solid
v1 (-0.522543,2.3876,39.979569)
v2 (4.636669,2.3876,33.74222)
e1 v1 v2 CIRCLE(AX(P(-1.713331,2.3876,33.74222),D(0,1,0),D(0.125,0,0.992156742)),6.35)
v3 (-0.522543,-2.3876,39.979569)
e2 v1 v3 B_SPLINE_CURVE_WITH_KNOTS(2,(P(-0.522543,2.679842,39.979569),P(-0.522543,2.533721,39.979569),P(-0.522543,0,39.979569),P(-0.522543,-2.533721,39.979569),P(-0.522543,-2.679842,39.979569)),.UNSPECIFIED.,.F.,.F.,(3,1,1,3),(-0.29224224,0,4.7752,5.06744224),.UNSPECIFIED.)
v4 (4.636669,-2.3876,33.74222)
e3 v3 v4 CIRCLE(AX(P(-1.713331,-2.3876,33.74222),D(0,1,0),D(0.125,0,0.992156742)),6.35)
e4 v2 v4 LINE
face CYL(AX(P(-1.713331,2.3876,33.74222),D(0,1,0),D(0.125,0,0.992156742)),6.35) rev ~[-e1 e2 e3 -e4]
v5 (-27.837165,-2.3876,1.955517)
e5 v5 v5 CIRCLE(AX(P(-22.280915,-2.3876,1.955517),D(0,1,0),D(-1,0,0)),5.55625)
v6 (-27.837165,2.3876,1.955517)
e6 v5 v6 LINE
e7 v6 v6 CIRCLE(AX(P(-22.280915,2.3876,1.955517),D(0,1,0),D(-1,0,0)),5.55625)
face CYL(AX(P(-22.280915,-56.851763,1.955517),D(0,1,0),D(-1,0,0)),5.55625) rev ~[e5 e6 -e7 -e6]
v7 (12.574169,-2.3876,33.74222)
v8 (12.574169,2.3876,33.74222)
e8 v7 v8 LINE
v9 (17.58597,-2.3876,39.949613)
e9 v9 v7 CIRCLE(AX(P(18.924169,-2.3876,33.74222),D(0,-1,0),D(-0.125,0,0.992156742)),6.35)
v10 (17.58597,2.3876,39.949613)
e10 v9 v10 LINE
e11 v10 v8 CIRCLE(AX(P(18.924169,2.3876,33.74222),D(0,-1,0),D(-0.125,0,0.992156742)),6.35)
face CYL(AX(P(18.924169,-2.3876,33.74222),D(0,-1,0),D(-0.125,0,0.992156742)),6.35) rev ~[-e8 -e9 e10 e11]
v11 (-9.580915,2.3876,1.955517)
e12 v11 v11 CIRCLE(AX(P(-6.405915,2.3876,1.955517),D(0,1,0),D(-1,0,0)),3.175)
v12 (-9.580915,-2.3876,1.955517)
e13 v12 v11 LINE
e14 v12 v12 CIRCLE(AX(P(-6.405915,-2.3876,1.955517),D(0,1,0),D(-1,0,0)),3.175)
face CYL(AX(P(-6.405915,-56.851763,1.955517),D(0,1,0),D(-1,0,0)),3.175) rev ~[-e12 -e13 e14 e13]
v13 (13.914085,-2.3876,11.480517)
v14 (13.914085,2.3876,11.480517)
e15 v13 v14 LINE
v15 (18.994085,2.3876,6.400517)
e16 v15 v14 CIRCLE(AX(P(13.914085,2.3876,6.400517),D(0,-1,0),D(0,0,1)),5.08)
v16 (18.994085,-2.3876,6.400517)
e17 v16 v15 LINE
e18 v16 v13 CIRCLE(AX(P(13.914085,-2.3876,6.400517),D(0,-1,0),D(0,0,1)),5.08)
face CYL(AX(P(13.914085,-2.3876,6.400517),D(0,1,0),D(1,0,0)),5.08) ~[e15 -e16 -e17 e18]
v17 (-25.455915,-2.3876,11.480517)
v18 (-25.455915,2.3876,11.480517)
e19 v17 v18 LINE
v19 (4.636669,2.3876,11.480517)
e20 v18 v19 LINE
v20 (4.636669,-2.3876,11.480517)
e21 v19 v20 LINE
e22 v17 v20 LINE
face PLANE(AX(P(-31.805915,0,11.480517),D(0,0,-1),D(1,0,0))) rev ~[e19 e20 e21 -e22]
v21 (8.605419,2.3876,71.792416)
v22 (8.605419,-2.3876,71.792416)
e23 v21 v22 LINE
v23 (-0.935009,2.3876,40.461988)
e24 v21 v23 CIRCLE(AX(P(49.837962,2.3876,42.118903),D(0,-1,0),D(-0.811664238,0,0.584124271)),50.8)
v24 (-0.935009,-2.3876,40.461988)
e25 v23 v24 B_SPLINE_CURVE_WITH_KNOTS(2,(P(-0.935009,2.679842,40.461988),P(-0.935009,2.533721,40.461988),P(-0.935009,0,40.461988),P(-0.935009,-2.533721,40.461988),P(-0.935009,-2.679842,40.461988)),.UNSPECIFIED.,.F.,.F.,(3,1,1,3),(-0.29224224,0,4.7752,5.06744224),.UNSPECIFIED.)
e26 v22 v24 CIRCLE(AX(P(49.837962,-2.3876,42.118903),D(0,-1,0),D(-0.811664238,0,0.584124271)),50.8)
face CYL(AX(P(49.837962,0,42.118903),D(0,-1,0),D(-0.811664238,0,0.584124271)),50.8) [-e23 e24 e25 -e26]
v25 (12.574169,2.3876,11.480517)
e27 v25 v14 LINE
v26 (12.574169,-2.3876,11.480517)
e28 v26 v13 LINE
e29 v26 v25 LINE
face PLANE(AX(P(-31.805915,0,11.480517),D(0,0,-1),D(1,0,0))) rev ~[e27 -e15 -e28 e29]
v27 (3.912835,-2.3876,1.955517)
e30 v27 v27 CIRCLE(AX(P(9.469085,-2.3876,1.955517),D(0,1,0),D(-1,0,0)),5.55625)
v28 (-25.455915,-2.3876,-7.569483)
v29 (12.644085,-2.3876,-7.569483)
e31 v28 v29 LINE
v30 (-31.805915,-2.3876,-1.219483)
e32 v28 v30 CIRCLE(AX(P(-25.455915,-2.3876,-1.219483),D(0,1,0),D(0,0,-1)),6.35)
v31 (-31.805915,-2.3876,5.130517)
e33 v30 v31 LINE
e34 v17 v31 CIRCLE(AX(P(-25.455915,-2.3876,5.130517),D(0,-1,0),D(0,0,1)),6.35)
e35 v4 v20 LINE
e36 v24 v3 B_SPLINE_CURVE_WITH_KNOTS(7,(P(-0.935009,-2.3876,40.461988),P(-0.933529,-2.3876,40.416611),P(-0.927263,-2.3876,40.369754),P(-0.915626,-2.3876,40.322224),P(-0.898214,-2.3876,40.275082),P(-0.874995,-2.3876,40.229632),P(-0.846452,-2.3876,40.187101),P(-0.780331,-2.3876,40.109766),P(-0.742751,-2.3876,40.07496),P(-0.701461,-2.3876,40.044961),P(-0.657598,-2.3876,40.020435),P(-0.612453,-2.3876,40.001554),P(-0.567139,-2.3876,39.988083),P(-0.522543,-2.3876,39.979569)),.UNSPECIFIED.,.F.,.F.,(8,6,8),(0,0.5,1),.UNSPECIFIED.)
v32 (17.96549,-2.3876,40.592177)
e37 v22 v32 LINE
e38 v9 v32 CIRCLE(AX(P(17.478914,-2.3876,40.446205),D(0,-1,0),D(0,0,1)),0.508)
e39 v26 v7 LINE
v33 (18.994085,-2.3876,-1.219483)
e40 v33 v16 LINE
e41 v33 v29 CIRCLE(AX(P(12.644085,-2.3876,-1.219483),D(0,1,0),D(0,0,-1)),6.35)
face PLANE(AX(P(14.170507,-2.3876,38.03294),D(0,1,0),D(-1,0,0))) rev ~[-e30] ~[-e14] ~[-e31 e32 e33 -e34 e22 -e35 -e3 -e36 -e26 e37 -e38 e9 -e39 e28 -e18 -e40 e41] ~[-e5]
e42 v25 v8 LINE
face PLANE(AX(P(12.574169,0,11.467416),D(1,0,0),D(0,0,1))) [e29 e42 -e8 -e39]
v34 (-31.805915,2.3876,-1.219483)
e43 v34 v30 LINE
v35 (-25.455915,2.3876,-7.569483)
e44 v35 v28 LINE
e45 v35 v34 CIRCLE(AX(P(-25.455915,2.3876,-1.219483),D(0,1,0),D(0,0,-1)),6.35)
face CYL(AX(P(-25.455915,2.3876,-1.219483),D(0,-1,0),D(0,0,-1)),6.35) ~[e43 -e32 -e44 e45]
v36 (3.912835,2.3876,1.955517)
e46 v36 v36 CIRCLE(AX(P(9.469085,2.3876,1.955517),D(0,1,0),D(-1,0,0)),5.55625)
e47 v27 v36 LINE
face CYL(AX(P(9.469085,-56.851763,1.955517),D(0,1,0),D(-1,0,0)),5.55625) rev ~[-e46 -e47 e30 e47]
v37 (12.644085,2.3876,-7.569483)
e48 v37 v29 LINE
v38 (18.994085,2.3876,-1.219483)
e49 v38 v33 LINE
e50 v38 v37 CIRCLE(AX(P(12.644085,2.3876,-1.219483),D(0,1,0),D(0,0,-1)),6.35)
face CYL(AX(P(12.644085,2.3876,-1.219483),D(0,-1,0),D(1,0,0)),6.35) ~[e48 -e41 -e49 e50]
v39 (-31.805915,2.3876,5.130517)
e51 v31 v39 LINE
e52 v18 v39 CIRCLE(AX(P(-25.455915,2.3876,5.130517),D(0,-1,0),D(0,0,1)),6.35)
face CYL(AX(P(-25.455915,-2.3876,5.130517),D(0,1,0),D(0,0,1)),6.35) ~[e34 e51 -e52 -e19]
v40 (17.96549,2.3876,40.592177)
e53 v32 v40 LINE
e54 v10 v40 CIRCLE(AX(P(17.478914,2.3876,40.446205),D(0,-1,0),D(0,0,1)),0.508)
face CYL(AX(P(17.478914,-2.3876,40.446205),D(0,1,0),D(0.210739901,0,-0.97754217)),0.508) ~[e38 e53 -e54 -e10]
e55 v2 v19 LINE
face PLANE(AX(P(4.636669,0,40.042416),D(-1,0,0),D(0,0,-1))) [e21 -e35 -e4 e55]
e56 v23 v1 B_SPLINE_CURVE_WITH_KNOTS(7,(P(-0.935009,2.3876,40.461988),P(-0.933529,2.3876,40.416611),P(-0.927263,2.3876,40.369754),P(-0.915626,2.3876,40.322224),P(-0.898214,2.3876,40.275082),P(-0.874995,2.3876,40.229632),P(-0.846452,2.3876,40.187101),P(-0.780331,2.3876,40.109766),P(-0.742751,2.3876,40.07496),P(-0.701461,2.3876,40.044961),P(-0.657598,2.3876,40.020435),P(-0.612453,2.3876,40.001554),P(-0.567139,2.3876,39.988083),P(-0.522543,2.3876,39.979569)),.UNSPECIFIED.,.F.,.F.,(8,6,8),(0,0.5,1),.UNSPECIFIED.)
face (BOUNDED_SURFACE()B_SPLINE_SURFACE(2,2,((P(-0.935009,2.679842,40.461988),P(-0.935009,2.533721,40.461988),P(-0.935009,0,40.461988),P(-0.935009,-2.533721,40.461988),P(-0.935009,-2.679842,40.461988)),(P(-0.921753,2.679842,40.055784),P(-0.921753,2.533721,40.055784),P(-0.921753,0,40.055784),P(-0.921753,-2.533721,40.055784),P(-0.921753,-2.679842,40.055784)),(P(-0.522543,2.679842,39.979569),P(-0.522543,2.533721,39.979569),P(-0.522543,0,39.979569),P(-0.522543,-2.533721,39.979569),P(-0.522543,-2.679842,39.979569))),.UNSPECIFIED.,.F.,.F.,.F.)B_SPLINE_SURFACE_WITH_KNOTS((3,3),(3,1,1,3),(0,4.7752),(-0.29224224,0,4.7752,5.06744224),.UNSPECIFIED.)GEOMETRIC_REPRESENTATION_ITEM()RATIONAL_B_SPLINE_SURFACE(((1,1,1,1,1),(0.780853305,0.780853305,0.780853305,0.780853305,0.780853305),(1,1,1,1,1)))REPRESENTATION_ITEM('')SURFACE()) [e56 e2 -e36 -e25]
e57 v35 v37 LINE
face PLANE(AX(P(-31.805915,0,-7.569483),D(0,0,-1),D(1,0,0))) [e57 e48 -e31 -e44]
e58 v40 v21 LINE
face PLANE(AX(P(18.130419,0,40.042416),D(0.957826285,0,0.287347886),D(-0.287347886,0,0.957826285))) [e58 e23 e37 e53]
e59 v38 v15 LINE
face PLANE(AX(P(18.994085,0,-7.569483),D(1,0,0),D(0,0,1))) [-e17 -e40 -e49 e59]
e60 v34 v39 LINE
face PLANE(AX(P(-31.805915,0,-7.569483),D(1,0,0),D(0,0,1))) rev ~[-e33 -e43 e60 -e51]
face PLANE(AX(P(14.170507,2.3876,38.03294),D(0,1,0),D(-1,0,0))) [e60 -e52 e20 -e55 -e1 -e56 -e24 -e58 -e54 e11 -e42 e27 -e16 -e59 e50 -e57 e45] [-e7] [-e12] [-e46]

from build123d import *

# Parameters (mm, degrees)
F1_W           = 50.8
F1_H           = 19.05
F2_DEPTH       = 2.3876
F2_DEPTH_BACK  = 2.3876
F3_R           = 5.08
F4_R           = 6.35
F5_R           = 6.35
F7_D           = 11.1125
F9_D           = 11.1125
F11_D          = 6.35
F13_DEPTH      = 2.3876
F13_DEPTH_BACK = 2.3876
F15_DEPTH      = 2.3876
F15_DEPTH_BACK = 2.3876
F16_T1_DEPTH   = 4.7752
F16_T6_DEPTH   = 4.7752
F17_R          = 0.508


# Not quite as in the source:
# - a fillet or chamfer that OpenCascade refuses, or shapes differently, is made with other operations: its cross-section is extruded or revolved along the edge and cut away or added


with BuildPart() as f2:
    # F1 (on face) → F2 (new body, two sides)
    with BuildSketch(Plane.XZ) as f2_sk:
        with Locations((-6.4059151608, 1.9555166364)):
            Rectangle(F1_W, F1_H)
    extrude(amount=F2_DEPTH)
    extrude(f2_sk.sketch, amount=-F2_DEPTH_BACK)

    # F3
    f3_edges = [f2.edges().sort_by_distance(p)[0] for p in [
        (18.994085, 0, 11.480517),
    ]]
    fillet(f3_edges, radius=F3_R)

    # F4
    f4_edges = [f2.edges().sort_by_distance(p)[0] for p in [
        (18.994085, 0, -7.569483),
    ]]
    fillet(f4_edges, radius=F4_R)

    # F5
    f5_edges = [f2.edges().sort_by_distance(p)[0] for p in [
        (-31.805915, 0, 11.480517),
        (-31.805915, 0, -7.569483),
    ]]
    fillet(f5_edges, radius=F5_R)

    # F7 (through all)
    with Locations(Plane.XZ.offset(2.3876)):
        with Locations((9.4690848392, 1.9555166364)):
            Hole(F7_D / 2)

    # F9 (through all)
    with Locations(Plane.XZ.offset(2.3876)):
        with Locations((-22.2809151608, 1.9555166364)):
            Hole(F9_D / 2)

    # F11 (through all)
    with Locations(Plane.XZ.offset(2.3876)):
        with Locations((-6.4059151608, 1.9555166364)):
            Hole(F11_D / 2)

    # F12 (on Front) → F13 (join, two sides)
    with BuildSketch(Plane.XZ) as f13_sk:
        Polygon((8.6054187268, 40.0424157364), (4.6366687268, 40.0424157364), (4.6366687268, 11.4674157364), (12.5741687268, 11.4674157364), (12.5741687268, 40.0424157364), align=None)
    extrude(amount=F13_DEPTH)
    extrude(f13_sk.sketch, amount=-F13_DEPTH_BACK)

    # F14 (on Front) → F15 (join, two sides)
    with BuildSketch(Plane.XZ) as f15_sk:
        with BuildLine():
            Line((18.1304187268, 40.0424157364), (8.6054187268, 71.7924157364))
            ThreePointArc((8.6054187268, 71.7924157364), (1.180386736, 56.7161753336), (-0.9195812732, 40.0424157364))
            Line((-0.9195812732, 40.0424157364), (8.6054187268, 40.0424157364))
            Line((8.6054187268, 40.0424157364), (18.1304187268, 40.0424157364))
        make_face()
    extrude(amount=F15_DEPTH)
    extrude(f15_sk.sketch, amount=-F15_DEPTH_BACK)

    # F16: fillet of radius 6.35 on 2 edges, made by hand

    # F16_s2 → F16_t1 (join)
    with BuildSketch(Plane.XZ.offset(-2.3876)):
        with BuildLine():
            ThreePointArc((-0.9195812732, 40.0424157364), (3.0491687268, 37.9423506332), (4.6366687268, 33.7422204269))
            Line((4.6366687268, 33.7422204269), (4.7636687268, 33.7422204269))
            Line((4.7636687268, 33.7422204269), (4.7636687268, 40.0424157364))
            Line((4.7636687268, 40.0424157364), (4.6366687268, 40.1694157364))
            ThreePointArc((4.6366687268, 40.1694157364), (1.8585437268, 40.1694157364), (-0.9037062732, 40.1684196426))
            Line((-0.9037062732, 40.1684196426), (-0.9195812732, 40.0424157364))
        make_face()
    extrude(amount=F16_T1_DEPTH)


with BuildPart() as f16_tool4:
    # F16_s5 → F16_t6 (new body)
    with BuildSketch(Plane.XZ.offset(2.3876)):
        with BuildLine():
            ThreePointArc((18.1304187268, 40.0424157364), (14.1616687268, 37.9423506332), (12.5741687268, 33.7422204269))
            Line((12.5741687268, 33.7422204269), (12.4471687268, 33.7422204269))
            Line((12.4471687268, 33.7422204269), (12.4471687268, 40.0424157364))
            Line((12.4471687268, 40.0424157364), (12.5741687268, 40.1694157364))
            ThreePointArc((12.5741687268, 40.1694157364), (15.3522937268, 40.1694157364), (18.1145437268, 40.1684196426))
            Line((18.1145437268, 40.1684196426), (18.1304187268, 40.0424157364))
        make_face()
    extrude(amount=-F16_T6_DEPTH)

    split(bisect_by=Plane(origin=(27.6542600438, 0, 8.2962780131), x_dir=(0, 1, 0), z_dir=(-0.9578262852, 0, -0.2873478856)), keep=Keep.TOP)


with BuildPart() as f2_1:
    add(f2.part)

    # F16_t3: union F16_tool4
    add(f16_tool4.part)

    # F17
    f17_edges = [f2_1.edges().sort_by_distance(p)[0] for p in [
        (18.130419, 0, 40.042416),
        (-0.919581, 0, 40.042416),
    ]]
    fillet(f17_edges, radius=F17_R)


solid = f2_1.part
